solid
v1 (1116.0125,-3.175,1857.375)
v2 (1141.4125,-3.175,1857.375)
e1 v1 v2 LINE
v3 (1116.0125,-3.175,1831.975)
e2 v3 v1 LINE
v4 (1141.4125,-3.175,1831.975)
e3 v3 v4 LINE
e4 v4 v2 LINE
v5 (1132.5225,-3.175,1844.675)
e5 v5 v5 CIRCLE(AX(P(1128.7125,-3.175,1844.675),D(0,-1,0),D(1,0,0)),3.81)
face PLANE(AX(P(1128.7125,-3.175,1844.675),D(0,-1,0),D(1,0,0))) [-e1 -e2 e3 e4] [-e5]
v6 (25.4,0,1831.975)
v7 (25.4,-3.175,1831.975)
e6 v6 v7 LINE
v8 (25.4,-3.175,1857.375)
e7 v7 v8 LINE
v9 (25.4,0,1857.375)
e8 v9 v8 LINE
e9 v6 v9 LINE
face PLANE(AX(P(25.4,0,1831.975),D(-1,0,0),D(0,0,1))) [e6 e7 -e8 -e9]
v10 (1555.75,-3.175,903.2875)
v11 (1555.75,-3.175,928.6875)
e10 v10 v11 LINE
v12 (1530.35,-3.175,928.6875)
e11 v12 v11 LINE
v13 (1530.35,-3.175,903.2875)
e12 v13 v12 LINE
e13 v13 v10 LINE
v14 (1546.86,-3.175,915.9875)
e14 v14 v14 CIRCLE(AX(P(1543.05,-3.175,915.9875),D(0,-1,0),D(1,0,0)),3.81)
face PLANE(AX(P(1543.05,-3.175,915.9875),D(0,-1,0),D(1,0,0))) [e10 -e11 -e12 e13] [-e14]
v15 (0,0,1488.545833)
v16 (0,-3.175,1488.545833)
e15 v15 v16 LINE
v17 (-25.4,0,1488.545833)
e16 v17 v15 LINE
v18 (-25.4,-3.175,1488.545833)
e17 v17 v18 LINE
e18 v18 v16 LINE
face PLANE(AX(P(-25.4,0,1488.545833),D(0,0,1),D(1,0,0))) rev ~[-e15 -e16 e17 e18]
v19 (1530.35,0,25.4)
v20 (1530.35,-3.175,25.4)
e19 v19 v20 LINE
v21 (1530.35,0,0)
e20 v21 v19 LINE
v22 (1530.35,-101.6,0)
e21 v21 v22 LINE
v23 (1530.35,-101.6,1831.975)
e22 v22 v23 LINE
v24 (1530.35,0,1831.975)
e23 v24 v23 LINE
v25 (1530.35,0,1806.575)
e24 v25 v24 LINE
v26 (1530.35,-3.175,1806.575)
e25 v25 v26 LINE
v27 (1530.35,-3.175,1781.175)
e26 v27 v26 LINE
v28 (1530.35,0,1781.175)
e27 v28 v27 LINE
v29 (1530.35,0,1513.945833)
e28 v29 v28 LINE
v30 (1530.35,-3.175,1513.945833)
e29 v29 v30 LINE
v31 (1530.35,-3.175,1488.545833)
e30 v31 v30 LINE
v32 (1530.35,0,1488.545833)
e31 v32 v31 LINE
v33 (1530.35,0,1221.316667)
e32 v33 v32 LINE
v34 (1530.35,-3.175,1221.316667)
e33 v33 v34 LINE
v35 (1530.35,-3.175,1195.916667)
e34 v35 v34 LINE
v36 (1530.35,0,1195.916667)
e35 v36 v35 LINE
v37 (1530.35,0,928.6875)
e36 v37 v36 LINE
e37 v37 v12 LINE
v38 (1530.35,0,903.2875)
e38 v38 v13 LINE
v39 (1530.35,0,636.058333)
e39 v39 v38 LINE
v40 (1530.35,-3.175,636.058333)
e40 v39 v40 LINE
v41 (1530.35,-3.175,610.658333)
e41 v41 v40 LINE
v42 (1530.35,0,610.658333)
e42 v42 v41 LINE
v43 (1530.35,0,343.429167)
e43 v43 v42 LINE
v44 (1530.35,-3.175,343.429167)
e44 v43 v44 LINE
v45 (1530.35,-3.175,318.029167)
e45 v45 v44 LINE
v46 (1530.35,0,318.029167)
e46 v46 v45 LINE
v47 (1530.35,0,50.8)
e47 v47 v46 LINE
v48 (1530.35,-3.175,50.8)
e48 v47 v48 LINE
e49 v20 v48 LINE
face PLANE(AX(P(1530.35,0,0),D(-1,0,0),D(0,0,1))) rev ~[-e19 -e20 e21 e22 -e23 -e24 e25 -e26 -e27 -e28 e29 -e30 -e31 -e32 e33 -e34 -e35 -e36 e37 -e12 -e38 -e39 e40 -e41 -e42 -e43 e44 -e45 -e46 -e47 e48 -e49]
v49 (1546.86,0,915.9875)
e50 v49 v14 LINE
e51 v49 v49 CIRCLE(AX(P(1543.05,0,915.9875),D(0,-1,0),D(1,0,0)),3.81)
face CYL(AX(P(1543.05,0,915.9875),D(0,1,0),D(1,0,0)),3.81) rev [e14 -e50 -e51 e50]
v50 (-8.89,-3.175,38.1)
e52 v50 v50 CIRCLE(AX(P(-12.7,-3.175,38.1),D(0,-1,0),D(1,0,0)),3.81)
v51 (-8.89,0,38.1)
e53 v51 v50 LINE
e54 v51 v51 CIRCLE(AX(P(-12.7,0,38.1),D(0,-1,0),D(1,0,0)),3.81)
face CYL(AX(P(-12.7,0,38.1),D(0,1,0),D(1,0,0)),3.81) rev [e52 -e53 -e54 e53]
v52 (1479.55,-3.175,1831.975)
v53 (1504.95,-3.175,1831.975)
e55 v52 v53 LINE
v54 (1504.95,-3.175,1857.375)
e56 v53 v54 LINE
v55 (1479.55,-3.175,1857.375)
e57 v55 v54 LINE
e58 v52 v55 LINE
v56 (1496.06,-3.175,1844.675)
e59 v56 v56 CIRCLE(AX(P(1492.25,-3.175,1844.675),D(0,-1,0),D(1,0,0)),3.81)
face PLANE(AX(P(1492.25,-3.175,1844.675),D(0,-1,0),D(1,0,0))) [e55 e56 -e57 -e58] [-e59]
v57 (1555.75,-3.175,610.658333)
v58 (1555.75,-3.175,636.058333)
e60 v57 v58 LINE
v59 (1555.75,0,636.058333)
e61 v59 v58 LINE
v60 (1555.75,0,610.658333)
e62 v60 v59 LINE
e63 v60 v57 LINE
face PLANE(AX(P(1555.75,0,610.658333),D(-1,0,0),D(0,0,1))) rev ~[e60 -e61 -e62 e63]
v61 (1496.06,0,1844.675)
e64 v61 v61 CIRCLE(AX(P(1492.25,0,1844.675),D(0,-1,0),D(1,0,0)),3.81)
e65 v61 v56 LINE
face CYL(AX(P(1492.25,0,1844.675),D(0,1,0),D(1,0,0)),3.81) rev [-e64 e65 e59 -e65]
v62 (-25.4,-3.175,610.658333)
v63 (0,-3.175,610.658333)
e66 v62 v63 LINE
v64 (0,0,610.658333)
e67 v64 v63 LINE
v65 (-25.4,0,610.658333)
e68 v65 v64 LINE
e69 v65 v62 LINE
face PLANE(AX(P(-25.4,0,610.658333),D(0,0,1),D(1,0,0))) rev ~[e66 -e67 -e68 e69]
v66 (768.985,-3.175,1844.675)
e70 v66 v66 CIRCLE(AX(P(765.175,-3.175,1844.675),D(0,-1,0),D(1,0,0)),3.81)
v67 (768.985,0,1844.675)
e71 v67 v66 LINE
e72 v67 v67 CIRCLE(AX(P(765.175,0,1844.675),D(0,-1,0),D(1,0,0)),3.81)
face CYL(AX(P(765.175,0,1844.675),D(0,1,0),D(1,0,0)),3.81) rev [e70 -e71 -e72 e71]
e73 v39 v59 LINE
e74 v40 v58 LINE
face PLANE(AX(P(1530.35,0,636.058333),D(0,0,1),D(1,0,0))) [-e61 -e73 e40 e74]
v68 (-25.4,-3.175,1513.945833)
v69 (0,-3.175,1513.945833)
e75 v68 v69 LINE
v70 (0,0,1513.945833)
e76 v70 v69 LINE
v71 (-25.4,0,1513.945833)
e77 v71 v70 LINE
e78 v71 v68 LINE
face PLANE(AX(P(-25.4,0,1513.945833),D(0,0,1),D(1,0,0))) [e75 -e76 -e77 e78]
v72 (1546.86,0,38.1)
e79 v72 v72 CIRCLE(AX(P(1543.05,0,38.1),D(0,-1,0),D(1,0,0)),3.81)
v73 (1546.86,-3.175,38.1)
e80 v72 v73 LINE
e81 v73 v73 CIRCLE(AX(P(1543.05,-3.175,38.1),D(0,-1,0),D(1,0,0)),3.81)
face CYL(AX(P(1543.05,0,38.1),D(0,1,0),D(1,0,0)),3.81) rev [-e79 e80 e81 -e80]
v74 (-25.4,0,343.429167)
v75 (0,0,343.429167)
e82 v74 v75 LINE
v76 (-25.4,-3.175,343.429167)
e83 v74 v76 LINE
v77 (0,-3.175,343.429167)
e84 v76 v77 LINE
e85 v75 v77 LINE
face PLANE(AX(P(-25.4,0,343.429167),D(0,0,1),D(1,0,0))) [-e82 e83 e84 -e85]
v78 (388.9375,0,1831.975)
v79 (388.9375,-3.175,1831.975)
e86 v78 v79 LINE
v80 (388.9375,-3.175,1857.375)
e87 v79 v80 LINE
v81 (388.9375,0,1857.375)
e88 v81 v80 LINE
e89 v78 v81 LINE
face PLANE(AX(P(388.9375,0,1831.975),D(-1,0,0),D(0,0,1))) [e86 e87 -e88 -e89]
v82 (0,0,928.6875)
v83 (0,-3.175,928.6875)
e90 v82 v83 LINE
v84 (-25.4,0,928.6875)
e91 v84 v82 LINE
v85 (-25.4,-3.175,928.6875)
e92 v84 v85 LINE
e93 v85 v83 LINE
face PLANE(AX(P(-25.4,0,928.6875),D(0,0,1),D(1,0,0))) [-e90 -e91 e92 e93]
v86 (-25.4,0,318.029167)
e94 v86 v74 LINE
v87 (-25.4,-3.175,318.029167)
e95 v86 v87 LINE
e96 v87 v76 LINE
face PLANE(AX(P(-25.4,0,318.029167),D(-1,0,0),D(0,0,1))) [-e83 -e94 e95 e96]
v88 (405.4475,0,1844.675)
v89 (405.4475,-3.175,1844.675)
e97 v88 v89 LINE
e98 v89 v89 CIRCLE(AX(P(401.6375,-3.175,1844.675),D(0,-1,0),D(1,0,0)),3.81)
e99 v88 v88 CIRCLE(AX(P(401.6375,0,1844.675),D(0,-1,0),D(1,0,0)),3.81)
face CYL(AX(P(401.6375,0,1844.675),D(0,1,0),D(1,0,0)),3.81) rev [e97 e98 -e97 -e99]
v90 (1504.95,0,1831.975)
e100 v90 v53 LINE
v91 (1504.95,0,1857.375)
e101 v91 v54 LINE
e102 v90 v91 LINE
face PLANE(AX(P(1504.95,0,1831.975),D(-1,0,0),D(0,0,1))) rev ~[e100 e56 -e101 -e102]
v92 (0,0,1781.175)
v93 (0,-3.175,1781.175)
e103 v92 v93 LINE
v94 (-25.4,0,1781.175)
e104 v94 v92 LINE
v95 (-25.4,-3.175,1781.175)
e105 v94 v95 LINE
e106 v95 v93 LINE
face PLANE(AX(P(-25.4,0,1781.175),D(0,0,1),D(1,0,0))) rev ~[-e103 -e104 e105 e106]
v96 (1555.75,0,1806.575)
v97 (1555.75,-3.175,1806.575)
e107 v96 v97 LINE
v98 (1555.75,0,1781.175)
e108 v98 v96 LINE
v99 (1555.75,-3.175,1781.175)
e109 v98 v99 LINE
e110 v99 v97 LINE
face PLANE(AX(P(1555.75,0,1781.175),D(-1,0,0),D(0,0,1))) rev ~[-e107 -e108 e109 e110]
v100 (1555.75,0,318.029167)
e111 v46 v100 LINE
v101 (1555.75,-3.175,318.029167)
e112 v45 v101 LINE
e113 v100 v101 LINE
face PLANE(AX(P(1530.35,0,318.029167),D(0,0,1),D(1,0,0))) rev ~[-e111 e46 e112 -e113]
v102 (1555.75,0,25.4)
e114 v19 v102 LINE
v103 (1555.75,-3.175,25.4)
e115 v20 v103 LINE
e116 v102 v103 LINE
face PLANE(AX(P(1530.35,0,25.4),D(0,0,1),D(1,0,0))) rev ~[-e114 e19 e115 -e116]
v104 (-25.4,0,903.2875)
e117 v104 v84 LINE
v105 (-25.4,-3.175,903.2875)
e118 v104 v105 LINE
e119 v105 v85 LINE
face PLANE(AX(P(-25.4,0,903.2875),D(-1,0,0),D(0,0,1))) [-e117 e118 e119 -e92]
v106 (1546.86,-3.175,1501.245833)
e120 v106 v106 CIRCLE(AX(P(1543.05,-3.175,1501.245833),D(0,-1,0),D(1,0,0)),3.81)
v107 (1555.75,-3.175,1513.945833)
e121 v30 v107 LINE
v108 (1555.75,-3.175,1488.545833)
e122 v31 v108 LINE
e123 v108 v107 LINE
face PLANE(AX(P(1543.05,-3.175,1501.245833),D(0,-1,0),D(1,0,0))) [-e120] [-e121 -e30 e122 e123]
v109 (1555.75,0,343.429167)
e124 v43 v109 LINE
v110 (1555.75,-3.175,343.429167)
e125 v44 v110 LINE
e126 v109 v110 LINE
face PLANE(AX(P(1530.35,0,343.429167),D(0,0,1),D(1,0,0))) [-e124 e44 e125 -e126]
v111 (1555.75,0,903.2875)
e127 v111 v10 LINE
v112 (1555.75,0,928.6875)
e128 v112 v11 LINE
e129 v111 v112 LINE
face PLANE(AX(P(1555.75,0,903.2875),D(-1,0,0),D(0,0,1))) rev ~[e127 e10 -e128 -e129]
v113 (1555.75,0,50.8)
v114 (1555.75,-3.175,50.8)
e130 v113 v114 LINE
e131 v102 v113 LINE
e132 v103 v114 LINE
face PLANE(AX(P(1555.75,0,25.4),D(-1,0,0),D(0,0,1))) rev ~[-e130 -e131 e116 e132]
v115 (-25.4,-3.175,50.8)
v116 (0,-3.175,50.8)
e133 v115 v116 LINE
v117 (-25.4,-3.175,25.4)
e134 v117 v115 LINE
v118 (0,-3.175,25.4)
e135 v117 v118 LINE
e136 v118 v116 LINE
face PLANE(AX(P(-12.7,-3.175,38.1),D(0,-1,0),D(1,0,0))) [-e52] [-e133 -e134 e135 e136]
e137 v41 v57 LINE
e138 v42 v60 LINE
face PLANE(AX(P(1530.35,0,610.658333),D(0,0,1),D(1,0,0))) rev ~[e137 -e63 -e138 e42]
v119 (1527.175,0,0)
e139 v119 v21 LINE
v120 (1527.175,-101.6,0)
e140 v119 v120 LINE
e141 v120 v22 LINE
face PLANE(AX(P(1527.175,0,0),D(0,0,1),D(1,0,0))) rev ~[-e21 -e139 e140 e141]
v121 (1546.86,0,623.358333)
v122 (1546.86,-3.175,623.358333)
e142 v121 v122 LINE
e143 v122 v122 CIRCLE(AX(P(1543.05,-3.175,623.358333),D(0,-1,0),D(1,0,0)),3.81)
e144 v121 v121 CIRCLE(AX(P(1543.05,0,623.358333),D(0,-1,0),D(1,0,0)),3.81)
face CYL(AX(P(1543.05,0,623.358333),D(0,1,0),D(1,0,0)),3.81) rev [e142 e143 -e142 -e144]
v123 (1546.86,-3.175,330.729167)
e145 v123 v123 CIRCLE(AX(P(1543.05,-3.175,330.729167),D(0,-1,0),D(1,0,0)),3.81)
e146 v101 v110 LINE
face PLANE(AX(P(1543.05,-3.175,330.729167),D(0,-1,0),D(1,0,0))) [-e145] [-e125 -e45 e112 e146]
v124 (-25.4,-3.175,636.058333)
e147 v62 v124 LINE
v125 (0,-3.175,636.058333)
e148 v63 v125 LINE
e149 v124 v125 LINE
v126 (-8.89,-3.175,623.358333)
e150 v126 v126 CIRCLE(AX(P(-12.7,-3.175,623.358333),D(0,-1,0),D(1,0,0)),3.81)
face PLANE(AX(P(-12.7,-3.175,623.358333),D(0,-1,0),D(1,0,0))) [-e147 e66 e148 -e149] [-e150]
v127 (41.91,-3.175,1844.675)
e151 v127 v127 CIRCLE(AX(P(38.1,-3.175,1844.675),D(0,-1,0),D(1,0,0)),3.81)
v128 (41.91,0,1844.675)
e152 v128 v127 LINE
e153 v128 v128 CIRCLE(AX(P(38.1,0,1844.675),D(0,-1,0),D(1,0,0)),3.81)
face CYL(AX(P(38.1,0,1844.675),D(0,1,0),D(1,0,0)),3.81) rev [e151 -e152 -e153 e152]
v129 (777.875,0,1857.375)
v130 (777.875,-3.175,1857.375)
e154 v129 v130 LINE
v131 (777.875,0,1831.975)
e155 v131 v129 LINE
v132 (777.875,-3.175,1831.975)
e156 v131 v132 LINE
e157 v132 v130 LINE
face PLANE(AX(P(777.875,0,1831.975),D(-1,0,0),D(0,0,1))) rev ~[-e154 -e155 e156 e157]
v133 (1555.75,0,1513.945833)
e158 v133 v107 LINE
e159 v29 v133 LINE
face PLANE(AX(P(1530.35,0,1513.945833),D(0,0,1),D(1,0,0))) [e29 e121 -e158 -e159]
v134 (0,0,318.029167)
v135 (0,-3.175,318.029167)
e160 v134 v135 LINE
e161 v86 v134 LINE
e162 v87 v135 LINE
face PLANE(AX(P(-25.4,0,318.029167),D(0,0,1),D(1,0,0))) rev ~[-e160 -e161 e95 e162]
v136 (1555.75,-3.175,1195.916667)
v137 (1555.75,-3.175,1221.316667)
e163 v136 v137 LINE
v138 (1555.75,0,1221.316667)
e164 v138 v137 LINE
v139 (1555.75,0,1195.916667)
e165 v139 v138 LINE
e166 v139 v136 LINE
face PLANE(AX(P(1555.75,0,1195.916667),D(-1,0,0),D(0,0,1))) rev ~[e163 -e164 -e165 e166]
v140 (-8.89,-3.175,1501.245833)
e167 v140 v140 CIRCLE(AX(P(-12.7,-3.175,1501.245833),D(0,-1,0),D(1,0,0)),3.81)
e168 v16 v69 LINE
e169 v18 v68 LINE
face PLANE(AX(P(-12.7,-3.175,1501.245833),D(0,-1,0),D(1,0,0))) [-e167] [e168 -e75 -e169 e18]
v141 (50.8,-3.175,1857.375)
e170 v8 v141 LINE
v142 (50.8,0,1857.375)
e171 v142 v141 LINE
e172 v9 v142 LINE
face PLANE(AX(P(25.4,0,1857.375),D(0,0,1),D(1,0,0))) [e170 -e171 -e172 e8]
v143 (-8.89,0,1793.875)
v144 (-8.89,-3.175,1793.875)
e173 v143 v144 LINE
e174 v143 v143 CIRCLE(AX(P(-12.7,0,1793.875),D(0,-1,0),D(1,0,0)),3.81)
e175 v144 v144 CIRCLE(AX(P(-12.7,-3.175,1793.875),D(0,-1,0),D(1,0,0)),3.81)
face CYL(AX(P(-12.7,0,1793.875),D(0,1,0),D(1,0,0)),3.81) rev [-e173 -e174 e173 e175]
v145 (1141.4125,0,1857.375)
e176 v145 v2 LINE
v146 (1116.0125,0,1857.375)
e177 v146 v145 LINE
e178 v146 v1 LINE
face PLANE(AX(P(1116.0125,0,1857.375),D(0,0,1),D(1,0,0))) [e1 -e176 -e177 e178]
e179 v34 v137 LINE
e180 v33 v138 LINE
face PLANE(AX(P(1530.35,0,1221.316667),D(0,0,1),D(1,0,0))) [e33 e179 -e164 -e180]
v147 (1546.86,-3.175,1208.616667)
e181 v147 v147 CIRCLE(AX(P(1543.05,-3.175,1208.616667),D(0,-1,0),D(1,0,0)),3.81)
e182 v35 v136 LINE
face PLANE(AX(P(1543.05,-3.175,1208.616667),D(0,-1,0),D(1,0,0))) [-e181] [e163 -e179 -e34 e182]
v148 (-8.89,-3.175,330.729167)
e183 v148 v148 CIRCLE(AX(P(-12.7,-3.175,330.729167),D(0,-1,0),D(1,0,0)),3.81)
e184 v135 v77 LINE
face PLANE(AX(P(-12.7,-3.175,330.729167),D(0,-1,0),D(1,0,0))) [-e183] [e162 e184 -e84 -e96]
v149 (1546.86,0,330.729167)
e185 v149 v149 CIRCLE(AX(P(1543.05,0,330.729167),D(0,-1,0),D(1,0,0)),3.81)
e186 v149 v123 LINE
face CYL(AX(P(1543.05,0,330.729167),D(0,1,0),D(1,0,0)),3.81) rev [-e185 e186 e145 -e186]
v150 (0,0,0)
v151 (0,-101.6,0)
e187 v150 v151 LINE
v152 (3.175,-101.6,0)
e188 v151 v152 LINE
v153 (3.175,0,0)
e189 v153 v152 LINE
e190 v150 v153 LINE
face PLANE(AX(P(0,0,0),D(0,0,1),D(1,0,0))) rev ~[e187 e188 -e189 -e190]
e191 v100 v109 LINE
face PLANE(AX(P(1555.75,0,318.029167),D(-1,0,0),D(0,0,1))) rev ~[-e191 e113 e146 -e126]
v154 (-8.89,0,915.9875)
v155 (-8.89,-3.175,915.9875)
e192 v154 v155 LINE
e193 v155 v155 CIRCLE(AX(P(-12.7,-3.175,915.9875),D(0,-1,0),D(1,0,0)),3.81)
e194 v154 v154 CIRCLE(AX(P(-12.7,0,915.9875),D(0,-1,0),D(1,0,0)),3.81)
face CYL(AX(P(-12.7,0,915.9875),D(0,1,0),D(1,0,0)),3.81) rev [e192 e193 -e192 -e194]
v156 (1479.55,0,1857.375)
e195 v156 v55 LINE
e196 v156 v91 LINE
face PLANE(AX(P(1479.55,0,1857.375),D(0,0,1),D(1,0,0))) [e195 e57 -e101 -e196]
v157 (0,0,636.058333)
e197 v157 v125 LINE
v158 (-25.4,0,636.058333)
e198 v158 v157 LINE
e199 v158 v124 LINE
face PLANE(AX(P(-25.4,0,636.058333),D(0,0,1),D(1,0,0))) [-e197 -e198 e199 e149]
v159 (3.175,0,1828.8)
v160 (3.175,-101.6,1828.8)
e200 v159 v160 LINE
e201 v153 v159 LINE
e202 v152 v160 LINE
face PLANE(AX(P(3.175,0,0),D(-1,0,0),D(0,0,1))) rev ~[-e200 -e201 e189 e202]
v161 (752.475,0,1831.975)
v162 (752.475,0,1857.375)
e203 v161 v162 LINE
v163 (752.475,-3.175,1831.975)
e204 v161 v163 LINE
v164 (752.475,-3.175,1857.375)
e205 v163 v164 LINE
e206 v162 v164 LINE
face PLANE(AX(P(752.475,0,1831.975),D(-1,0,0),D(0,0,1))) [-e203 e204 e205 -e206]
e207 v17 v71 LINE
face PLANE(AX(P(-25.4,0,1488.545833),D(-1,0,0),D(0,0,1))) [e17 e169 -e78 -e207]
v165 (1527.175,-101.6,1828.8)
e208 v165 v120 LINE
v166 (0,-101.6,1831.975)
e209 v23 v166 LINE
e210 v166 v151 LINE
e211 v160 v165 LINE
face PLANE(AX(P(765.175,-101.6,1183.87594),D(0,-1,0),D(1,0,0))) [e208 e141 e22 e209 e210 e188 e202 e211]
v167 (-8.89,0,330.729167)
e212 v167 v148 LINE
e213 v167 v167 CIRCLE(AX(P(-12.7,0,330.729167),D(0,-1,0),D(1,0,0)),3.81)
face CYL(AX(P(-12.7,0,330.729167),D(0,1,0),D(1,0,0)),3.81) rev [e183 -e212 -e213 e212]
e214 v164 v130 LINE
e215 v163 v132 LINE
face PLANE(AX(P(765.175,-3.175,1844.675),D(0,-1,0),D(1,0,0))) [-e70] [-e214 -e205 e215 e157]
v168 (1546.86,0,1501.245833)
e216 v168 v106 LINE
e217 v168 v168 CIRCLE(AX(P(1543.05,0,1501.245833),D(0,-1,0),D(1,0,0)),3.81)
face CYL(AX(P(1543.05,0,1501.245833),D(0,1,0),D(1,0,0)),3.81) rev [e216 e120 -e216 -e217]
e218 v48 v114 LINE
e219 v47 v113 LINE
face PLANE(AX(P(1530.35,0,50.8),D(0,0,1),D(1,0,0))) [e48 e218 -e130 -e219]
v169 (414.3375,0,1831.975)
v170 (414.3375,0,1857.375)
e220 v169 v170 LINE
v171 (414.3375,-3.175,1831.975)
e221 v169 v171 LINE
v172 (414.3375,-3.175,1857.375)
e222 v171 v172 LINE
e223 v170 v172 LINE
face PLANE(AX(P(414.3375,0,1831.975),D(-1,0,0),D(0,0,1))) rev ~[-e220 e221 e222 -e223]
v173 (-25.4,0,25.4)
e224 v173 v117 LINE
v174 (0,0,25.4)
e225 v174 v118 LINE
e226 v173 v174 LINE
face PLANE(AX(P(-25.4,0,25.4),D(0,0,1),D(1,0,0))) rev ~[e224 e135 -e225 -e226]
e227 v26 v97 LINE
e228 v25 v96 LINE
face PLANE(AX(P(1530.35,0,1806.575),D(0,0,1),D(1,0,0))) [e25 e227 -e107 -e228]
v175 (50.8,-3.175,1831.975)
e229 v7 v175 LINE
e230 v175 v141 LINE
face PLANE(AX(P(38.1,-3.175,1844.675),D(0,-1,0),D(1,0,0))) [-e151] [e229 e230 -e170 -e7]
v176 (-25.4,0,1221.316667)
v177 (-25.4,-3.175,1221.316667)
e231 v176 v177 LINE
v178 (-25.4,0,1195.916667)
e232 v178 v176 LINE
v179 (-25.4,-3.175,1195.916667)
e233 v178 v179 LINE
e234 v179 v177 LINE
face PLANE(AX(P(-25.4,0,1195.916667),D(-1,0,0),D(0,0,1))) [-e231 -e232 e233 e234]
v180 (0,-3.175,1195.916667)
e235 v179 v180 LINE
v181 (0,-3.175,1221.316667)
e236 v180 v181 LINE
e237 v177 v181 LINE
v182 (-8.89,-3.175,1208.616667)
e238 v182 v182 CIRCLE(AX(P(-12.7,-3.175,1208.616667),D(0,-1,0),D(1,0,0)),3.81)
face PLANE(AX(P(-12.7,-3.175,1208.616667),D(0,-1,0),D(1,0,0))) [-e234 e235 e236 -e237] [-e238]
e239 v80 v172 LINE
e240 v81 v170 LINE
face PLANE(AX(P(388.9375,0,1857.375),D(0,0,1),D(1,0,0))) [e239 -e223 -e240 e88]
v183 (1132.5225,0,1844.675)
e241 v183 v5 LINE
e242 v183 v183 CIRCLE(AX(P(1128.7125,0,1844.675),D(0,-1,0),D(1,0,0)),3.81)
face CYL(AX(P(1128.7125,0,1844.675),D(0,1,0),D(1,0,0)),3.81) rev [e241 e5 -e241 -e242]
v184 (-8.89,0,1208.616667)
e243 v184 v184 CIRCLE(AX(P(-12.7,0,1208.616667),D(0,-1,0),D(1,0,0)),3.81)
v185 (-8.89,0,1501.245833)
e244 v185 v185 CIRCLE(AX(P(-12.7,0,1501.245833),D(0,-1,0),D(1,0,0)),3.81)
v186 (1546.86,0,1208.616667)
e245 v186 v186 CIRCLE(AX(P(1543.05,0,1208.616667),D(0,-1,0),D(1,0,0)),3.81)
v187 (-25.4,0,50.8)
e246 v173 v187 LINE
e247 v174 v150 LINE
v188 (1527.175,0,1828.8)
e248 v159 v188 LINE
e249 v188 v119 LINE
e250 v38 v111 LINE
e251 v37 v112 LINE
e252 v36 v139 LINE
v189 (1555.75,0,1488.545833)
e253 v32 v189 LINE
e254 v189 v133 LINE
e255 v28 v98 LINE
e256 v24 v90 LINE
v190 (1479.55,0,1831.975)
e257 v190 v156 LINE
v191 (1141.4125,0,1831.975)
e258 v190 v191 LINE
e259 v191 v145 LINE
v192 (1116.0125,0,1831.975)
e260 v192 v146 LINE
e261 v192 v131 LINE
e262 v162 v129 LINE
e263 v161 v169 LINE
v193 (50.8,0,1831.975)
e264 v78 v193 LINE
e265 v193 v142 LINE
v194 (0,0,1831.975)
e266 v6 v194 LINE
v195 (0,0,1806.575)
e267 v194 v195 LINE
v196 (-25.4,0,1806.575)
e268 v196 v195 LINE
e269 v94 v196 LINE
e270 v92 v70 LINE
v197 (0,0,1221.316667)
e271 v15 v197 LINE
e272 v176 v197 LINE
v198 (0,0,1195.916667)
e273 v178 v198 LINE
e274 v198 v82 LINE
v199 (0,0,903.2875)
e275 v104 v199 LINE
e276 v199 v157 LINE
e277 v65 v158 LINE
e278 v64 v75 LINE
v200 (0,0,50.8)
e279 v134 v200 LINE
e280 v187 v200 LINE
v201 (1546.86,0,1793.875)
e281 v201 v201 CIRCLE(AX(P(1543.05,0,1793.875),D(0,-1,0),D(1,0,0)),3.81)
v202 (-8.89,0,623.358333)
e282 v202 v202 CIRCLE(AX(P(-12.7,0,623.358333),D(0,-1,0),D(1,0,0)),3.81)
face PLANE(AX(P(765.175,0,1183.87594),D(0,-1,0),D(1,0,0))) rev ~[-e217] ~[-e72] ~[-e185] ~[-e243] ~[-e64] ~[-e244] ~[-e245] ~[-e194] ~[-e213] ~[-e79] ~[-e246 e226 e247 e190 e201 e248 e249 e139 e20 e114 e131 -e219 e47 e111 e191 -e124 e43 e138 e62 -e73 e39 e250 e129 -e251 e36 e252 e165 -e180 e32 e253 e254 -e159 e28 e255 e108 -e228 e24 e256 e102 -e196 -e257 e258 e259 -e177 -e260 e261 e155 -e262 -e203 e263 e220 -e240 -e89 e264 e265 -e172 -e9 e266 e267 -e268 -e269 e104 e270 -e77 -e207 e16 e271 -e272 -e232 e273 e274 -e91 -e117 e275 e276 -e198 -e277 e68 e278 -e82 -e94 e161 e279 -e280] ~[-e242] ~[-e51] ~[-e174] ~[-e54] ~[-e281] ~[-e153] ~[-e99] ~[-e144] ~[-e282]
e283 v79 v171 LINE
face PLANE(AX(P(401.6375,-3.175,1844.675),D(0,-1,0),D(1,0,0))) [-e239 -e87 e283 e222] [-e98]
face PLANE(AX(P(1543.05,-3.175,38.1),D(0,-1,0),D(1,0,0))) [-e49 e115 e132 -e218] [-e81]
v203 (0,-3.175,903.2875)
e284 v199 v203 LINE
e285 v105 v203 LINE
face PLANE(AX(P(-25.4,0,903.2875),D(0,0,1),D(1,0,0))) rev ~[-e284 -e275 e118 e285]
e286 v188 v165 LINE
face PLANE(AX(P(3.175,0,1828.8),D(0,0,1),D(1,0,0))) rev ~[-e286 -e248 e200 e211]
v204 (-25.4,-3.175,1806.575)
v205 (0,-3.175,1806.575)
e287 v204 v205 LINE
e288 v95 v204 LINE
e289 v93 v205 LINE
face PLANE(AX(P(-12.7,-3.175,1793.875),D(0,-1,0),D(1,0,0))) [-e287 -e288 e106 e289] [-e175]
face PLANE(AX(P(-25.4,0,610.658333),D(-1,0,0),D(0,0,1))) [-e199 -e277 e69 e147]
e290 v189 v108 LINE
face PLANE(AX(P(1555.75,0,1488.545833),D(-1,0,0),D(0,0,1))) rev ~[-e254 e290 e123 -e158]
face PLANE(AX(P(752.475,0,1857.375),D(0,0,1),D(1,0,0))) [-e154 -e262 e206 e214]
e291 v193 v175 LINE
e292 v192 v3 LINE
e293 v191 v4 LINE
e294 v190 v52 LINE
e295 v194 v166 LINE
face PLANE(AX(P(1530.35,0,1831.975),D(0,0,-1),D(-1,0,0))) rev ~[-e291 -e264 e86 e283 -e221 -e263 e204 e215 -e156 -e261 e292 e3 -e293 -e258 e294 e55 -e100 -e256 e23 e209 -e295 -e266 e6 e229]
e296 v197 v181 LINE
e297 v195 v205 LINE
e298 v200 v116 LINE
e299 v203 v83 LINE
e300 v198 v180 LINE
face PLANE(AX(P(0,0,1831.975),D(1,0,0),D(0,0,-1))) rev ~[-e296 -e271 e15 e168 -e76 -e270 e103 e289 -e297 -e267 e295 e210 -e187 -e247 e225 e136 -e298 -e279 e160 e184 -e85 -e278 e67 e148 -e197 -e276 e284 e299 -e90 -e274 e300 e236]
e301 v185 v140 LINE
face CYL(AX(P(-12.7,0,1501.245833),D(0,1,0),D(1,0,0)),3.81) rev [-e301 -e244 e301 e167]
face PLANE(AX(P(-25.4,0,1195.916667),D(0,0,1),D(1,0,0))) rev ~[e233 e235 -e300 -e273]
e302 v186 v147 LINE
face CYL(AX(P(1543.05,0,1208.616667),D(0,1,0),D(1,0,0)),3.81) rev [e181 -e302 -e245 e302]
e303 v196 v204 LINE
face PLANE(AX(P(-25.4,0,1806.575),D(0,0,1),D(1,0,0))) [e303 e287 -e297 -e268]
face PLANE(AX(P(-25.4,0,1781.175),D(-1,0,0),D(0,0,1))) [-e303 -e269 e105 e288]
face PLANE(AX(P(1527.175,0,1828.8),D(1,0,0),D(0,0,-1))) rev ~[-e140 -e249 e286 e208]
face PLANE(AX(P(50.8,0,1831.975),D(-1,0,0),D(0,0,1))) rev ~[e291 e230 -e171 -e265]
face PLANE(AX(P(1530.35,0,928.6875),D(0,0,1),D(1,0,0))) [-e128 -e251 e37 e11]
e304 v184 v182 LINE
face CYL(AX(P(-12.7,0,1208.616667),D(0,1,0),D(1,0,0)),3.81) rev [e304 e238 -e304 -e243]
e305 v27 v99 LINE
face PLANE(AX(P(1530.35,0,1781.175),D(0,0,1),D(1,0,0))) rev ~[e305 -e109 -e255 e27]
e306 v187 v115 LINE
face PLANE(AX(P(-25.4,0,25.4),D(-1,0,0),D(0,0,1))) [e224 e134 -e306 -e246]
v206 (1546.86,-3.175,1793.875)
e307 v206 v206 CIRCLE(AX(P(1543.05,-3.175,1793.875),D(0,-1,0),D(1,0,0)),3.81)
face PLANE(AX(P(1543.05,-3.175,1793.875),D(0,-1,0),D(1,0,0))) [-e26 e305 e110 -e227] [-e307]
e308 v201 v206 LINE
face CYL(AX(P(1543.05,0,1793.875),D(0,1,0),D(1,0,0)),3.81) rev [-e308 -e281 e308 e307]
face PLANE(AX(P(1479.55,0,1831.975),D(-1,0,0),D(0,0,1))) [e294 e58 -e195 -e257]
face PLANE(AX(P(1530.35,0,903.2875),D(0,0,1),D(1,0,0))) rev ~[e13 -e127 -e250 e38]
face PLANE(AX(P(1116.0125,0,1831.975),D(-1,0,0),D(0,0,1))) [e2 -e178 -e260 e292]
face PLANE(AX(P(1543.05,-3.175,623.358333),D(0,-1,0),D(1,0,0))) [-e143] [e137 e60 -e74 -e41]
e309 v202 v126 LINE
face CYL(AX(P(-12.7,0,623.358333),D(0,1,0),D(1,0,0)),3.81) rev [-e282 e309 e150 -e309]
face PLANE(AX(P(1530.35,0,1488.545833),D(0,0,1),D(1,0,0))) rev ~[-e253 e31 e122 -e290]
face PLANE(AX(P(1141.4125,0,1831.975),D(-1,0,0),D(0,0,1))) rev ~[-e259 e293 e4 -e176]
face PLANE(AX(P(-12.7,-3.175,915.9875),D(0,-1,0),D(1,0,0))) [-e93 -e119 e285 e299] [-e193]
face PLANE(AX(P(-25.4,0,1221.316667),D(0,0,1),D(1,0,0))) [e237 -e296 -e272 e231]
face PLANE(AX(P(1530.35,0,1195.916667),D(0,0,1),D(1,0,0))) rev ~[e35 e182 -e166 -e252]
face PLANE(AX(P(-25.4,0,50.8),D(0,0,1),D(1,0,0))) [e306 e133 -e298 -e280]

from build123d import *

# Parameters (mm, degrees)
F1_DEPTH = 101.6
F0_W     = 25.4
F0_H     = 25.4
F0_R     = 3.81
F2_DEPTH = 3.175


# Not quite as in the source:
# - a feature names something its author has since deleted; it is built from what else it names


with BuildPart() as f1:
    # F0 (on Front) → F1 (new body)
    with BuildSketch(Plane.XZ):
        Polygon((0, 25.4), (0, 0), (3.175, 0), (3.175, 1828.8), (1527.175, 1828.8), (1527.175, 0), (1530.35, 0), (1530.35, 25.4), (1530.35, 50.8), (1530.35, 318.0291666667), (1530.35, 343.4291666667), (1530.35, 610.6583333333), (1530.35, 636.0583333333), (1530.35, 903.2875), (1530.35, 928.6875), (1530.35, 1195.9166666667), (1530.35, 1221.3166666667), (1530.35, 1488.5458333333), (1530.35, 1513.9458333333), (1530.35, 1781.175), (1530.35, 1806.575), (1530.35, 1831.975), (1504.95, 1831.975), (1479.55, 1831.975), (1141.4125, 1831.975), (1116.0125, 1831.975), (777.875, 1831.975), (752.475, 1831.975), (414.3375, 1831.975), (388.9375, 1831.975), (50.8, 1831.975), (25.4, 1831.975), (0, 1831.975), (0, 1806.575), (0, 1781.175), (0, 1513.9458333333), (0, 1488.5458333333), (0, 1221.3166666667), (0, 1195.9166666667), (0, 928.6875), (0, 903.2875), (0, 636.0583333333), (0, 610.6583333333), (0, 343.4291666667), (0, 318.0291666667), (0, 50.8), align=None)
    extrude(amount=F1_DEPTH)

    # F0 (on Front) → F2 (join)
    with BuildSketch(Plane.XZ):
        with Locations((-12.7, 38.1)):
            Rectangle(F0_W, F0_H)
        with Locations((-12.7, 38.1)):
            Circle(F0_R, mode=Mode.SUBTRACT)
        with Locations((-12.7, 330.7291666667)):
            Rectangle(F0_W, F0_H)
        with Locations((-12.7, 330.7291666667)):
            Circle(F0_R, mode=Mode.SUBTRACT)
        with Locations((-12.7, 623.3583333333)):
            Rectangle(F0_W, F0_H)
        with Locations((-12.7, 623.3583333333)):
            Circle(F0_R, mode=Mode.SUBTRACT)
        with Locations((1543.05, 38.1)):
            Rectangle(F0_W, F0_H)
        with Locations((1543.05, 38.1)):
            Circle(F0_R, mode=Mode.SUBTRACT)
        with Locations((-12.7, 915.9875)):
            Rectangle(F0_W, F0_H)
        with Locations((-12.7, 915.9875)):
            Circle(F0_R, mode=Mode.SUBTRACT)
        with Locations((1543.05, 330.7291666667)):
            Rectangle(F0_W, F0_H)
        with Locations((1543.05, 330.7291666667)):
            Circle(F0_R, mode=Mode.SUBTRACT)
        with Locations((-12.7, 1208.6166666667)):
            Rectangle(F0_W, F0_H)
        with Locations((-12.7, 1208.6166666667)):
            Circle(F0_R, mode=Mode.SUBTRACT)
        with Locations((1543.05, 623.3583333333)):
            Rectangle(F0_W, F0_H)
        with Locations((1543.05, 623.3583333333)):
            Circle(F0_R, mode=Mode.SUBTRACT)
        with Locations((-12.7, 1501.2458333333)):
            Rectangle(F0_W, F0_H)
        with Locations((-12.7, 1501.2458333333)):
            Circle(F0_R, mode=Mode.SUBTRACT)
        with Locations((1543.05, 915.9875)):
            Rectangle(F0_W, F0_H)
        with Locations((1543.05, 915.9875)):
            Circle(F0_R, mode=Mode.SUBTRACT)
        with Locations((-12.7, 1793.875)):
            Rectangle(F0_W, F0_H)
        with Locations((-12.7, 1793.875)):
            Circle(F0_R, mode=Mode.SUBTRACT)
        with Locations((1543.05, 1208.6166666667)):
            Rectangle(F0_W, F0_H)
        with Locations((1543.05, 1208.6166666667)):
            Circle(F0_R, mode=Mode.SUBTRACT)
        with Locations((38.1, 1844.675)):
            Rectangle(F0_W, F0_H)
        with Locations((38.1, 1844.675)):
            Circle(F0_R, mode=Mode.SUBTRACT)
        with Locations((1543.05, 1501.2458333333)):
            Rectangle(F0_W, F0_H)
        with Locations((1543.05, 1501.2458333333)):
            Circle(F0_R, mode=Mode.SUBTRACT)
        with Locations((401.6375, 1844.675)):
            Rectangle(F0_W, F0_H)
        with Locations((401.6375, 1844.675)):
            Circle(F0_R, mode=Mode.SUBTRACT)
        with Locations((1543.05, 1793.875)):
            Rectangle(F0_W, F0_H)
        with Locations((1543.05, 1793.875)):
            Circle(F0_R, mode=Mode.SUBTRACT)
        with Locations((765.175, 1844.675)):
            Rectangle(F0_W, F0_H)
        with Locations((765.175, 1844.675)):
            Circle(F0_R, mode=Mode.SUBTRACT)
        with Locations((1492.25, 1844.675)):
            Rectangle(F0_W, F0_H)
        with Locations((1492.25, 1844.675)):
            Circle(F0_R, mode=Mode.SUBTRACT)
        with Locations((1128.7125, 1844.675)):
            Rectangle(F0_W, F0_H)
        with Locations((1128.7125, 1844.675)):
            Circle(F0_R, mode=Mode.SUBTRACT)
    extrude(amount=F2_DEPTH)


solid = f1.part
